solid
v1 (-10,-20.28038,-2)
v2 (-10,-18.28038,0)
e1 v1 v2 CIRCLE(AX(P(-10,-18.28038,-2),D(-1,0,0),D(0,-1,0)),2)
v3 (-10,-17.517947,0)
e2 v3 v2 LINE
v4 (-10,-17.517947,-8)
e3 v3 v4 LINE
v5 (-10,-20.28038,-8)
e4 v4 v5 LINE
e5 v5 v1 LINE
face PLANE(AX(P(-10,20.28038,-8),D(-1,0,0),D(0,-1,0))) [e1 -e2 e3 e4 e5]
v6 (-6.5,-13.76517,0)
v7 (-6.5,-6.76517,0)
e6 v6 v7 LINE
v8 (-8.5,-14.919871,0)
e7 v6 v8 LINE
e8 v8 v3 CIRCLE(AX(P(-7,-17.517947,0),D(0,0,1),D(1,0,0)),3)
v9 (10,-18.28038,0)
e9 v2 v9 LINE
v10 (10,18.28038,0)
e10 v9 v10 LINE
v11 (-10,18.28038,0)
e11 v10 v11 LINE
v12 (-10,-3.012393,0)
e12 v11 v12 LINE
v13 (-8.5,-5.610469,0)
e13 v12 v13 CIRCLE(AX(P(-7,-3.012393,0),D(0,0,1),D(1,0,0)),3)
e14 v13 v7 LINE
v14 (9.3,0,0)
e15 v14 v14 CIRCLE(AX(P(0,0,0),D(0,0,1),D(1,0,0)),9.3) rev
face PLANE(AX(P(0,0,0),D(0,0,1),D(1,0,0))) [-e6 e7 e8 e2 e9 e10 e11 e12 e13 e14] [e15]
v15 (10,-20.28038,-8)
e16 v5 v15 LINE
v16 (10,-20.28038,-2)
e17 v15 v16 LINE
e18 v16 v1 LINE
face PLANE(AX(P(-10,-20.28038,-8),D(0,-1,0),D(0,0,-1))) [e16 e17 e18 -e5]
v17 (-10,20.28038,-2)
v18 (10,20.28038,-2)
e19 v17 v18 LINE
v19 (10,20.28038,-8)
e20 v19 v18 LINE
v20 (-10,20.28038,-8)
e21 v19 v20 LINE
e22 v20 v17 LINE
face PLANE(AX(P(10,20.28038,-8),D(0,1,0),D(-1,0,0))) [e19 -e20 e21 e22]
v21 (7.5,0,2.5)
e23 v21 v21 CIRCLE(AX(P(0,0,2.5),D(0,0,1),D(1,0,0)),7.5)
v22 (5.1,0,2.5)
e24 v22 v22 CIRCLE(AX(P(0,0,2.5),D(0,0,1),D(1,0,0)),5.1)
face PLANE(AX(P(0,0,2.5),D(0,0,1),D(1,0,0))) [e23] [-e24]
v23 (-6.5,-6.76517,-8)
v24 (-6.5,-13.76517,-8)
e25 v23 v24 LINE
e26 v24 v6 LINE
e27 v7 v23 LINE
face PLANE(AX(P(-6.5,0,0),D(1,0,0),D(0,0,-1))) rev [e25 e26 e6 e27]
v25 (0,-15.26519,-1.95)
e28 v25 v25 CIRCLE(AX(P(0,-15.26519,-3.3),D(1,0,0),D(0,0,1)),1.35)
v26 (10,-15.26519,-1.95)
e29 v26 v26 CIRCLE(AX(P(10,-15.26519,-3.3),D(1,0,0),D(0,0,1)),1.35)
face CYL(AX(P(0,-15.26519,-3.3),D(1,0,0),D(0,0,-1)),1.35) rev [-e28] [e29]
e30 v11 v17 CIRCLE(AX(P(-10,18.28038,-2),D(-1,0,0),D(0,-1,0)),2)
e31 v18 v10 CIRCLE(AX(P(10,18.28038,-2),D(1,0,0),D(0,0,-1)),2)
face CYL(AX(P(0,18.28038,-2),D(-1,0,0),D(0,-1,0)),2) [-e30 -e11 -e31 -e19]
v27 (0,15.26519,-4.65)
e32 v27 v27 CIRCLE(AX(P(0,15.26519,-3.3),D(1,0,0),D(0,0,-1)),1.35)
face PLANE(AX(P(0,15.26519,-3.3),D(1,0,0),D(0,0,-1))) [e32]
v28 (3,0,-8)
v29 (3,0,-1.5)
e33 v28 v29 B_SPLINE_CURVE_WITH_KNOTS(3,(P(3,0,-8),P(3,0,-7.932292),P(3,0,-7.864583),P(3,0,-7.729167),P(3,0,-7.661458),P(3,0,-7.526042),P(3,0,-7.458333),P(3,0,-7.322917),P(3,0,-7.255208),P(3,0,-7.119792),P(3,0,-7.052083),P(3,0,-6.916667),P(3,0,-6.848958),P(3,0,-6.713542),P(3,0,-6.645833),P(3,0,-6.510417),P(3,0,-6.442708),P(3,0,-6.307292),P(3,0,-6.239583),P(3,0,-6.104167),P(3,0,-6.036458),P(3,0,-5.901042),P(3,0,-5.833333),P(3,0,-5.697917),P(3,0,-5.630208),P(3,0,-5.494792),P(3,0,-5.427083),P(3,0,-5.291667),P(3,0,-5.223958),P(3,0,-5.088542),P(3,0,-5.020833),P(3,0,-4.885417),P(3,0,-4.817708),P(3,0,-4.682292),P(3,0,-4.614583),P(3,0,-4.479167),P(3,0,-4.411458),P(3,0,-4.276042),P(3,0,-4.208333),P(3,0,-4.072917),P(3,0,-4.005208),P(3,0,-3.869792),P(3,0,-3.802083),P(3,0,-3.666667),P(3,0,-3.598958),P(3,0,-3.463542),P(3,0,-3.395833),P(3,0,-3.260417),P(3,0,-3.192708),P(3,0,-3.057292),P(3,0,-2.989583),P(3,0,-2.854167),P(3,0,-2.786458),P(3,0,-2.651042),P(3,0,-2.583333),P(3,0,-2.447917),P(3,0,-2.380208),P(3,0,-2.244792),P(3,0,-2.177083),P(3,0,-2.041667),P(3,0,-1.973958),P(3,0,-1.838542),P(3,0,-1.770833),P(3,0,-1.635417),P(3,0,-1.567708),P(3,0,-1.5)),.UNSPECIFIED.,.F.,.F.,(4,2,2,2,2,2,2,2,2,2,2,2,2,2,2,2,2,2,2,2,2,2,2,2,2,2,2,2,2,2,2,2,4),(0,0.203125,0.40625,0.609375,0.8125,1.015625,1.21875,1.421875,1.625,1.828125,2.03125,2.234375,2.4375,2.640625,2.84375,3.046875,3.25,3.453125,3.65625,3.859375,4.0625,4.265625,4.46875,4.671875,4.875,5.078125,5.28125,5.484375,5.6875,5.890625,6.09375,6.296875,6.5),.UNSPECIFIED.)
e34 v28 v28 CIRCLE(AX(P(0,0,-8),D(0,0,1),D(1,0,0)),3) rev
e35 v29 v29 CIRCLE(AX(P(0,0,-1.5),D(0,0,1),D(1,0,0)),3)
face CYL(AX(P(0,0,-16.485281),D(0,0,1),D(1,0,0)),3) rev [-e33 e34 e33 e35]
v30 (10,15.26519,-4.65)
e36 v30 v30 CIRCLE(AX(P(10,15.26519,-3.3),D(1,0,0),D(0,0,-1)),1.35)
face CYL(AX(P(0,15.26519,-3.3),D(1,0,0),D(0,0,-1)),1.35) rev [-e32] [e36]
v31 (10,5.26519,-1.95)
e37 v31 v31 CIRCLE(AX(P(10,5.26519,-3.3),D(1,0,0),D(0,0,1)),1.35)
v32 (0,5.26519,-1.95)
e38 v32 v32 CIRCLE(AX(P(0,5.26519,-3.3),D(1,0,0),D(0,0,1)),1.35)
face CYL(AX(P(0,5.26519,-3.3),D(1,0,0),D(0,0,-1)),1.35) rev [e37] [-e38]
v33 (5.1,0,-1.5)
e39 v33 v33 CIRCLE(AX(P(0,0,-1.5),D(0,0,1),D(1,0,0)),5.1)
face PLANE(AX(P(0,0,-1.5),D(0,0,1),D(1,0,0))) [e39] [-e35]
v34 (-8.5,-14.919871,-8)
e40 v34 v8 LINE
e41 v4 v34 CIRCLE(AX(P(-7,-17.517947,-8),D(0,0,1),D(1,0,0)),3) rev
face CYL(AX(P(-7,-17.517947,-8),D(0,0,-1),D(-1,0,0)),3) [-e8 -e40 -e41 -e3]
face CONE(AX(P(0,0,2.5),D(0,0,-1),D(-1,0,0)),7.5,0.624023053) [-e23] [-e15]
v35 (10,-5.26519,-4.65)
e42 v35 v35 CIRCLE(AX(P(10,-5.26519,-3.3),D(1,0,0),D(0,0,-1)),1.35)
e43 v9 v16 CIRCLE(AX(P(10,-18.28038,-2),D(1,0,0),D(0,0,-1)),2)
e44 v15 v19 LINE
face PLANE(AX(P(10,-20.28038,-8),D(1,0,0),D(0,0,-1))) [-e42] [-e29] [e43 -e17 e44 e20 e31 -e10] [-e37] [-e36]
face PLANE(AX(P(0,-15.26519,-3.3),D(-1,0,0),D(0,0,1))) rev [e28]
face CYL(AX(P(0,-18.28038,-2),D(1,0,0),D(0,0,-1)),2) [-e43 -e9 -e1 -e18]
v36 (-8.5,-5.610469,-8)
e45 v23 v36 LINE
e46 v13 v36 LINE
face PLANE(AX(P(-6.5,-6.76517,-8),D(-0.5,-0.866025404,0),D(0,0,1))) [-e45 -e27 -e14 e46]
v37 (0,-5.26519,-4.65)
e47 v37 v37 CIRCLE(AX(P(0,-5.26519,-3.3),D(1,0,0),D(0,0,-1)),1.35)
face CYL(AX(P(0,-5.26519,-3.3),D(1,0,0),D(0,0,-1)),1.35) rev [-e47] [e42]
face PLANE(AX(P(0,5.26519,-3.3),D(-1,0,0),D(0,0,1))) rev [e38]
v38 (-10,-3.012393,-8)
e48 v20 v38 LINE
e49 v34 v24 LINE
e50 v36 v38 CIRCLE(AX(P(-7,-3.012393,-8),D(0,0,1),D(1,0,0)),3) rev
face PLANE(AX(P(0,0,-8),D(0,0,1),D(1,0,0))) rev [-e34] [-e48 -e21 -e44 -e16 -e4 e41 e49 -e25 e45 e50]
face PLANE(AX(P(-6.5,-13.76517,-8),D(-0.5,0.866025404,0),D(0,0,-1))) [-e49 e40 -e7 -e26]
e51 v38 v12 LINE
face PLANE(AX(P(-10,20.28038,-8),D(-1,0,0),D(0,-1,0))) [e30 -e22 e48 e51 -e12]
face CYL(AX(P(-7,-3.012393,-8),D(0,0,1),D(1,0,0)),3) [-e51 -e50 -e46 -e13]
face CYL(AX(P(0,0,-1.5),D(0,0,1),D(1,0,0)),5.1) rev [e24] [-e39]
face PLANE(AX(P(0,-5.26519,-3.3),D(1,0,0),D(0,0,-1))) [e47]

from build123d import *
from OCP.BRepFilletAPI import BRepFilletAPI_MakeChamfer

# Parameters (mm, degrees)
SKETCH1_W           = 20
SKETCH1_H           = 40.56076
BOSS_EXTRUDE1_DEPTH = 8
SKETCH6_R           = 1.35
CUT_EXTRUDE1_DEPTH  = 10
SKETCH8_R           = 7.5
BOSS_EXTRUDE2_DEPTH = 2.5
SKETCH9_R           = 5.1
CUT_EXTRUDE3_DEPTH  = 4
SKETCH10_R          = 3
CUT_EXTRUDE4_DEPTH  = 6.5
FILLET1_R           = 2
CHAMFER1_SIZE2      = 2.5
CHAMFER1_SIZE       = 1.8
SKETCH11_W          = 8
SKETCH11_H          = 7
CUT_EXTRUDE5_DEPTH  = 3.5
CHAMFER2_SIZE       = 2.020725942
CHAMFER2_SIZE_2     = 3.5
FILLET2_R           = 3


with BuildPart() as part:
    # Sketch1 → Boss-Extrude1 (new body)
    with BuildSketch(Plane.XY):
        Rectangle(SKETCH1_W, SKETCH1_H)
    extrude(amount=-BOSS_EXTRUDE1_DEPTH)

    # Sketch6 → Cut-Extrude1 (cut)
    with BuildSketch(Plane(origin=(10, 0, 0), x_dir=(0, 0, -1), z_dir=(1, 0, 0))):
        with Locations(Location((3.3, -15.26519, 0), (0, 0, 180))):
            Circle(SKETCH6_R)
        with Locations((3.3, -5.26519)):
            Circle(SKETCH6_R)
        with Locations((3.3, 15.26519)):
            Circle(SKETCH6_R)
        with Locations(Location((3.3, 5.26519, 0), (0, 0, 180))):
            Circle(SKETCH6_R)
    extrude(amount=-CUT_EXTRUDE1_DEPTH, mode=Mode.SUBTRACT)

    # Sketch8 → Boss-Extrude2 (add)
    with BuildSketch(Plane.XY):
        Circle(SKETCH8_R)
    extrude(amount=BOSS_EXTRUDE2_DEPTH)

    # Sketch9 → Cut-Extrude3 (cut)
    with BuildSketch(Plane.XY.offset(2.5)):
        Circle(SKETCH9_R)
    extrude(amount=-CUT_EXTRUDE3_DEPTH, mode=Mode.SUBTRACT)

    # Sketch10 → Cut-Extrude4 (cut)
    with BuildSketch(Plane.XY.offset(-1.5)):
        Circle(SKETCH10_R)
    extrude(amount=-CUT_EXTRUDE4_DEPTH, mode=Mode.SUBTRACT)

    # Fillet1
    fillet1_edges = [part.edges().sort_by_distance(p)[0] for p in [
        (0, -20.28038, 0),
        (0, 20.28038, 0),
    ]]
    fillet(fillet1_edges, radius=FILLET1_R)

    # Chamfer1
    chamfer1_edges = [part.edges().sort_by_distance(p)[0] for p in [
        (-7.5, 0, 0),
    ]]
    chamfer1_side = [part.faces().sort_by_distance(p)[0] for p in [
        (-7.536, 0, 0),
    ]]
    chamfer(chamfer1_edges, length=CHAMFER1_SIZE - 0.0001, length2=CHAMFER1_SIZE2 - 0.0001, reference=chamfer1_side[0])  # a hair under: the kernel refuses the full size

    # Sketch11 → Cut-Extrude5 (cut)
    with BuildSketch(Plane.ZY.offset(10)):
        with Locations((-4, -10.26517)):
            Rectangle(SKETCH11_W, SKETCH11_H)
    extrude(amount=-CUT_EXTRUDE5_DEPTH, mode=Mode.SUBTRACT)

    # Chamfer2
    chamfer2_edges_1 = [part.edges().sort_by_distance(p)[0] for p in [
        (-10, -13.76517, -4),
    ]]
    chamfer2_side_1 = [part.faces().sort_by_distance(p)[0] for p in [
        (-10, -13.805584519, -4),
    ]]
    chamfer2_edges_2 = [part.edges().sort_by_distance(p)[0] for p in [
        (-10, -6.76517, -4),
    ]]
    chamfer2_side_2 = [part.faces().sort_by_distance(p)[0] for p in [
        (-9.959585481, -6.76517, -4),
    ]]
    chamfer2 = BRepFilletAPI_MakeChamfer(part.part.solid().wrapped)
    for e in chamfer2_edges_1:
        chamfer2.Add(CHAMFER2_SIZE - 0.0001, CHAMFER2_SIZE_2 - 0.0001, e.wrapped, chamfer2_side_1[0].wrapped)
    for e in chamfer2_edges_2:
        chamfer2.Add(CHAMFER2_SIZE_2 - 0.0001, CHAMFER2_SIZE - 0.0001, e.wrapped, chamfer2_side_2[0].wrapped)
    add(Compound.cast(chamfer2.Shape()), mode=Mode.REPLACE)  # a hair under: the kernel refuses the full size

    # Fillet2
    fillet2_edges = [part.edges().sort_by_distance(p)[0] for p in [
        (-10, -15.785795942, -4),
        (-10, -4.744544058, -4),
    ]]
    fillet(fillet2_edges, radius=FILLET2_R)


solid = part.part
